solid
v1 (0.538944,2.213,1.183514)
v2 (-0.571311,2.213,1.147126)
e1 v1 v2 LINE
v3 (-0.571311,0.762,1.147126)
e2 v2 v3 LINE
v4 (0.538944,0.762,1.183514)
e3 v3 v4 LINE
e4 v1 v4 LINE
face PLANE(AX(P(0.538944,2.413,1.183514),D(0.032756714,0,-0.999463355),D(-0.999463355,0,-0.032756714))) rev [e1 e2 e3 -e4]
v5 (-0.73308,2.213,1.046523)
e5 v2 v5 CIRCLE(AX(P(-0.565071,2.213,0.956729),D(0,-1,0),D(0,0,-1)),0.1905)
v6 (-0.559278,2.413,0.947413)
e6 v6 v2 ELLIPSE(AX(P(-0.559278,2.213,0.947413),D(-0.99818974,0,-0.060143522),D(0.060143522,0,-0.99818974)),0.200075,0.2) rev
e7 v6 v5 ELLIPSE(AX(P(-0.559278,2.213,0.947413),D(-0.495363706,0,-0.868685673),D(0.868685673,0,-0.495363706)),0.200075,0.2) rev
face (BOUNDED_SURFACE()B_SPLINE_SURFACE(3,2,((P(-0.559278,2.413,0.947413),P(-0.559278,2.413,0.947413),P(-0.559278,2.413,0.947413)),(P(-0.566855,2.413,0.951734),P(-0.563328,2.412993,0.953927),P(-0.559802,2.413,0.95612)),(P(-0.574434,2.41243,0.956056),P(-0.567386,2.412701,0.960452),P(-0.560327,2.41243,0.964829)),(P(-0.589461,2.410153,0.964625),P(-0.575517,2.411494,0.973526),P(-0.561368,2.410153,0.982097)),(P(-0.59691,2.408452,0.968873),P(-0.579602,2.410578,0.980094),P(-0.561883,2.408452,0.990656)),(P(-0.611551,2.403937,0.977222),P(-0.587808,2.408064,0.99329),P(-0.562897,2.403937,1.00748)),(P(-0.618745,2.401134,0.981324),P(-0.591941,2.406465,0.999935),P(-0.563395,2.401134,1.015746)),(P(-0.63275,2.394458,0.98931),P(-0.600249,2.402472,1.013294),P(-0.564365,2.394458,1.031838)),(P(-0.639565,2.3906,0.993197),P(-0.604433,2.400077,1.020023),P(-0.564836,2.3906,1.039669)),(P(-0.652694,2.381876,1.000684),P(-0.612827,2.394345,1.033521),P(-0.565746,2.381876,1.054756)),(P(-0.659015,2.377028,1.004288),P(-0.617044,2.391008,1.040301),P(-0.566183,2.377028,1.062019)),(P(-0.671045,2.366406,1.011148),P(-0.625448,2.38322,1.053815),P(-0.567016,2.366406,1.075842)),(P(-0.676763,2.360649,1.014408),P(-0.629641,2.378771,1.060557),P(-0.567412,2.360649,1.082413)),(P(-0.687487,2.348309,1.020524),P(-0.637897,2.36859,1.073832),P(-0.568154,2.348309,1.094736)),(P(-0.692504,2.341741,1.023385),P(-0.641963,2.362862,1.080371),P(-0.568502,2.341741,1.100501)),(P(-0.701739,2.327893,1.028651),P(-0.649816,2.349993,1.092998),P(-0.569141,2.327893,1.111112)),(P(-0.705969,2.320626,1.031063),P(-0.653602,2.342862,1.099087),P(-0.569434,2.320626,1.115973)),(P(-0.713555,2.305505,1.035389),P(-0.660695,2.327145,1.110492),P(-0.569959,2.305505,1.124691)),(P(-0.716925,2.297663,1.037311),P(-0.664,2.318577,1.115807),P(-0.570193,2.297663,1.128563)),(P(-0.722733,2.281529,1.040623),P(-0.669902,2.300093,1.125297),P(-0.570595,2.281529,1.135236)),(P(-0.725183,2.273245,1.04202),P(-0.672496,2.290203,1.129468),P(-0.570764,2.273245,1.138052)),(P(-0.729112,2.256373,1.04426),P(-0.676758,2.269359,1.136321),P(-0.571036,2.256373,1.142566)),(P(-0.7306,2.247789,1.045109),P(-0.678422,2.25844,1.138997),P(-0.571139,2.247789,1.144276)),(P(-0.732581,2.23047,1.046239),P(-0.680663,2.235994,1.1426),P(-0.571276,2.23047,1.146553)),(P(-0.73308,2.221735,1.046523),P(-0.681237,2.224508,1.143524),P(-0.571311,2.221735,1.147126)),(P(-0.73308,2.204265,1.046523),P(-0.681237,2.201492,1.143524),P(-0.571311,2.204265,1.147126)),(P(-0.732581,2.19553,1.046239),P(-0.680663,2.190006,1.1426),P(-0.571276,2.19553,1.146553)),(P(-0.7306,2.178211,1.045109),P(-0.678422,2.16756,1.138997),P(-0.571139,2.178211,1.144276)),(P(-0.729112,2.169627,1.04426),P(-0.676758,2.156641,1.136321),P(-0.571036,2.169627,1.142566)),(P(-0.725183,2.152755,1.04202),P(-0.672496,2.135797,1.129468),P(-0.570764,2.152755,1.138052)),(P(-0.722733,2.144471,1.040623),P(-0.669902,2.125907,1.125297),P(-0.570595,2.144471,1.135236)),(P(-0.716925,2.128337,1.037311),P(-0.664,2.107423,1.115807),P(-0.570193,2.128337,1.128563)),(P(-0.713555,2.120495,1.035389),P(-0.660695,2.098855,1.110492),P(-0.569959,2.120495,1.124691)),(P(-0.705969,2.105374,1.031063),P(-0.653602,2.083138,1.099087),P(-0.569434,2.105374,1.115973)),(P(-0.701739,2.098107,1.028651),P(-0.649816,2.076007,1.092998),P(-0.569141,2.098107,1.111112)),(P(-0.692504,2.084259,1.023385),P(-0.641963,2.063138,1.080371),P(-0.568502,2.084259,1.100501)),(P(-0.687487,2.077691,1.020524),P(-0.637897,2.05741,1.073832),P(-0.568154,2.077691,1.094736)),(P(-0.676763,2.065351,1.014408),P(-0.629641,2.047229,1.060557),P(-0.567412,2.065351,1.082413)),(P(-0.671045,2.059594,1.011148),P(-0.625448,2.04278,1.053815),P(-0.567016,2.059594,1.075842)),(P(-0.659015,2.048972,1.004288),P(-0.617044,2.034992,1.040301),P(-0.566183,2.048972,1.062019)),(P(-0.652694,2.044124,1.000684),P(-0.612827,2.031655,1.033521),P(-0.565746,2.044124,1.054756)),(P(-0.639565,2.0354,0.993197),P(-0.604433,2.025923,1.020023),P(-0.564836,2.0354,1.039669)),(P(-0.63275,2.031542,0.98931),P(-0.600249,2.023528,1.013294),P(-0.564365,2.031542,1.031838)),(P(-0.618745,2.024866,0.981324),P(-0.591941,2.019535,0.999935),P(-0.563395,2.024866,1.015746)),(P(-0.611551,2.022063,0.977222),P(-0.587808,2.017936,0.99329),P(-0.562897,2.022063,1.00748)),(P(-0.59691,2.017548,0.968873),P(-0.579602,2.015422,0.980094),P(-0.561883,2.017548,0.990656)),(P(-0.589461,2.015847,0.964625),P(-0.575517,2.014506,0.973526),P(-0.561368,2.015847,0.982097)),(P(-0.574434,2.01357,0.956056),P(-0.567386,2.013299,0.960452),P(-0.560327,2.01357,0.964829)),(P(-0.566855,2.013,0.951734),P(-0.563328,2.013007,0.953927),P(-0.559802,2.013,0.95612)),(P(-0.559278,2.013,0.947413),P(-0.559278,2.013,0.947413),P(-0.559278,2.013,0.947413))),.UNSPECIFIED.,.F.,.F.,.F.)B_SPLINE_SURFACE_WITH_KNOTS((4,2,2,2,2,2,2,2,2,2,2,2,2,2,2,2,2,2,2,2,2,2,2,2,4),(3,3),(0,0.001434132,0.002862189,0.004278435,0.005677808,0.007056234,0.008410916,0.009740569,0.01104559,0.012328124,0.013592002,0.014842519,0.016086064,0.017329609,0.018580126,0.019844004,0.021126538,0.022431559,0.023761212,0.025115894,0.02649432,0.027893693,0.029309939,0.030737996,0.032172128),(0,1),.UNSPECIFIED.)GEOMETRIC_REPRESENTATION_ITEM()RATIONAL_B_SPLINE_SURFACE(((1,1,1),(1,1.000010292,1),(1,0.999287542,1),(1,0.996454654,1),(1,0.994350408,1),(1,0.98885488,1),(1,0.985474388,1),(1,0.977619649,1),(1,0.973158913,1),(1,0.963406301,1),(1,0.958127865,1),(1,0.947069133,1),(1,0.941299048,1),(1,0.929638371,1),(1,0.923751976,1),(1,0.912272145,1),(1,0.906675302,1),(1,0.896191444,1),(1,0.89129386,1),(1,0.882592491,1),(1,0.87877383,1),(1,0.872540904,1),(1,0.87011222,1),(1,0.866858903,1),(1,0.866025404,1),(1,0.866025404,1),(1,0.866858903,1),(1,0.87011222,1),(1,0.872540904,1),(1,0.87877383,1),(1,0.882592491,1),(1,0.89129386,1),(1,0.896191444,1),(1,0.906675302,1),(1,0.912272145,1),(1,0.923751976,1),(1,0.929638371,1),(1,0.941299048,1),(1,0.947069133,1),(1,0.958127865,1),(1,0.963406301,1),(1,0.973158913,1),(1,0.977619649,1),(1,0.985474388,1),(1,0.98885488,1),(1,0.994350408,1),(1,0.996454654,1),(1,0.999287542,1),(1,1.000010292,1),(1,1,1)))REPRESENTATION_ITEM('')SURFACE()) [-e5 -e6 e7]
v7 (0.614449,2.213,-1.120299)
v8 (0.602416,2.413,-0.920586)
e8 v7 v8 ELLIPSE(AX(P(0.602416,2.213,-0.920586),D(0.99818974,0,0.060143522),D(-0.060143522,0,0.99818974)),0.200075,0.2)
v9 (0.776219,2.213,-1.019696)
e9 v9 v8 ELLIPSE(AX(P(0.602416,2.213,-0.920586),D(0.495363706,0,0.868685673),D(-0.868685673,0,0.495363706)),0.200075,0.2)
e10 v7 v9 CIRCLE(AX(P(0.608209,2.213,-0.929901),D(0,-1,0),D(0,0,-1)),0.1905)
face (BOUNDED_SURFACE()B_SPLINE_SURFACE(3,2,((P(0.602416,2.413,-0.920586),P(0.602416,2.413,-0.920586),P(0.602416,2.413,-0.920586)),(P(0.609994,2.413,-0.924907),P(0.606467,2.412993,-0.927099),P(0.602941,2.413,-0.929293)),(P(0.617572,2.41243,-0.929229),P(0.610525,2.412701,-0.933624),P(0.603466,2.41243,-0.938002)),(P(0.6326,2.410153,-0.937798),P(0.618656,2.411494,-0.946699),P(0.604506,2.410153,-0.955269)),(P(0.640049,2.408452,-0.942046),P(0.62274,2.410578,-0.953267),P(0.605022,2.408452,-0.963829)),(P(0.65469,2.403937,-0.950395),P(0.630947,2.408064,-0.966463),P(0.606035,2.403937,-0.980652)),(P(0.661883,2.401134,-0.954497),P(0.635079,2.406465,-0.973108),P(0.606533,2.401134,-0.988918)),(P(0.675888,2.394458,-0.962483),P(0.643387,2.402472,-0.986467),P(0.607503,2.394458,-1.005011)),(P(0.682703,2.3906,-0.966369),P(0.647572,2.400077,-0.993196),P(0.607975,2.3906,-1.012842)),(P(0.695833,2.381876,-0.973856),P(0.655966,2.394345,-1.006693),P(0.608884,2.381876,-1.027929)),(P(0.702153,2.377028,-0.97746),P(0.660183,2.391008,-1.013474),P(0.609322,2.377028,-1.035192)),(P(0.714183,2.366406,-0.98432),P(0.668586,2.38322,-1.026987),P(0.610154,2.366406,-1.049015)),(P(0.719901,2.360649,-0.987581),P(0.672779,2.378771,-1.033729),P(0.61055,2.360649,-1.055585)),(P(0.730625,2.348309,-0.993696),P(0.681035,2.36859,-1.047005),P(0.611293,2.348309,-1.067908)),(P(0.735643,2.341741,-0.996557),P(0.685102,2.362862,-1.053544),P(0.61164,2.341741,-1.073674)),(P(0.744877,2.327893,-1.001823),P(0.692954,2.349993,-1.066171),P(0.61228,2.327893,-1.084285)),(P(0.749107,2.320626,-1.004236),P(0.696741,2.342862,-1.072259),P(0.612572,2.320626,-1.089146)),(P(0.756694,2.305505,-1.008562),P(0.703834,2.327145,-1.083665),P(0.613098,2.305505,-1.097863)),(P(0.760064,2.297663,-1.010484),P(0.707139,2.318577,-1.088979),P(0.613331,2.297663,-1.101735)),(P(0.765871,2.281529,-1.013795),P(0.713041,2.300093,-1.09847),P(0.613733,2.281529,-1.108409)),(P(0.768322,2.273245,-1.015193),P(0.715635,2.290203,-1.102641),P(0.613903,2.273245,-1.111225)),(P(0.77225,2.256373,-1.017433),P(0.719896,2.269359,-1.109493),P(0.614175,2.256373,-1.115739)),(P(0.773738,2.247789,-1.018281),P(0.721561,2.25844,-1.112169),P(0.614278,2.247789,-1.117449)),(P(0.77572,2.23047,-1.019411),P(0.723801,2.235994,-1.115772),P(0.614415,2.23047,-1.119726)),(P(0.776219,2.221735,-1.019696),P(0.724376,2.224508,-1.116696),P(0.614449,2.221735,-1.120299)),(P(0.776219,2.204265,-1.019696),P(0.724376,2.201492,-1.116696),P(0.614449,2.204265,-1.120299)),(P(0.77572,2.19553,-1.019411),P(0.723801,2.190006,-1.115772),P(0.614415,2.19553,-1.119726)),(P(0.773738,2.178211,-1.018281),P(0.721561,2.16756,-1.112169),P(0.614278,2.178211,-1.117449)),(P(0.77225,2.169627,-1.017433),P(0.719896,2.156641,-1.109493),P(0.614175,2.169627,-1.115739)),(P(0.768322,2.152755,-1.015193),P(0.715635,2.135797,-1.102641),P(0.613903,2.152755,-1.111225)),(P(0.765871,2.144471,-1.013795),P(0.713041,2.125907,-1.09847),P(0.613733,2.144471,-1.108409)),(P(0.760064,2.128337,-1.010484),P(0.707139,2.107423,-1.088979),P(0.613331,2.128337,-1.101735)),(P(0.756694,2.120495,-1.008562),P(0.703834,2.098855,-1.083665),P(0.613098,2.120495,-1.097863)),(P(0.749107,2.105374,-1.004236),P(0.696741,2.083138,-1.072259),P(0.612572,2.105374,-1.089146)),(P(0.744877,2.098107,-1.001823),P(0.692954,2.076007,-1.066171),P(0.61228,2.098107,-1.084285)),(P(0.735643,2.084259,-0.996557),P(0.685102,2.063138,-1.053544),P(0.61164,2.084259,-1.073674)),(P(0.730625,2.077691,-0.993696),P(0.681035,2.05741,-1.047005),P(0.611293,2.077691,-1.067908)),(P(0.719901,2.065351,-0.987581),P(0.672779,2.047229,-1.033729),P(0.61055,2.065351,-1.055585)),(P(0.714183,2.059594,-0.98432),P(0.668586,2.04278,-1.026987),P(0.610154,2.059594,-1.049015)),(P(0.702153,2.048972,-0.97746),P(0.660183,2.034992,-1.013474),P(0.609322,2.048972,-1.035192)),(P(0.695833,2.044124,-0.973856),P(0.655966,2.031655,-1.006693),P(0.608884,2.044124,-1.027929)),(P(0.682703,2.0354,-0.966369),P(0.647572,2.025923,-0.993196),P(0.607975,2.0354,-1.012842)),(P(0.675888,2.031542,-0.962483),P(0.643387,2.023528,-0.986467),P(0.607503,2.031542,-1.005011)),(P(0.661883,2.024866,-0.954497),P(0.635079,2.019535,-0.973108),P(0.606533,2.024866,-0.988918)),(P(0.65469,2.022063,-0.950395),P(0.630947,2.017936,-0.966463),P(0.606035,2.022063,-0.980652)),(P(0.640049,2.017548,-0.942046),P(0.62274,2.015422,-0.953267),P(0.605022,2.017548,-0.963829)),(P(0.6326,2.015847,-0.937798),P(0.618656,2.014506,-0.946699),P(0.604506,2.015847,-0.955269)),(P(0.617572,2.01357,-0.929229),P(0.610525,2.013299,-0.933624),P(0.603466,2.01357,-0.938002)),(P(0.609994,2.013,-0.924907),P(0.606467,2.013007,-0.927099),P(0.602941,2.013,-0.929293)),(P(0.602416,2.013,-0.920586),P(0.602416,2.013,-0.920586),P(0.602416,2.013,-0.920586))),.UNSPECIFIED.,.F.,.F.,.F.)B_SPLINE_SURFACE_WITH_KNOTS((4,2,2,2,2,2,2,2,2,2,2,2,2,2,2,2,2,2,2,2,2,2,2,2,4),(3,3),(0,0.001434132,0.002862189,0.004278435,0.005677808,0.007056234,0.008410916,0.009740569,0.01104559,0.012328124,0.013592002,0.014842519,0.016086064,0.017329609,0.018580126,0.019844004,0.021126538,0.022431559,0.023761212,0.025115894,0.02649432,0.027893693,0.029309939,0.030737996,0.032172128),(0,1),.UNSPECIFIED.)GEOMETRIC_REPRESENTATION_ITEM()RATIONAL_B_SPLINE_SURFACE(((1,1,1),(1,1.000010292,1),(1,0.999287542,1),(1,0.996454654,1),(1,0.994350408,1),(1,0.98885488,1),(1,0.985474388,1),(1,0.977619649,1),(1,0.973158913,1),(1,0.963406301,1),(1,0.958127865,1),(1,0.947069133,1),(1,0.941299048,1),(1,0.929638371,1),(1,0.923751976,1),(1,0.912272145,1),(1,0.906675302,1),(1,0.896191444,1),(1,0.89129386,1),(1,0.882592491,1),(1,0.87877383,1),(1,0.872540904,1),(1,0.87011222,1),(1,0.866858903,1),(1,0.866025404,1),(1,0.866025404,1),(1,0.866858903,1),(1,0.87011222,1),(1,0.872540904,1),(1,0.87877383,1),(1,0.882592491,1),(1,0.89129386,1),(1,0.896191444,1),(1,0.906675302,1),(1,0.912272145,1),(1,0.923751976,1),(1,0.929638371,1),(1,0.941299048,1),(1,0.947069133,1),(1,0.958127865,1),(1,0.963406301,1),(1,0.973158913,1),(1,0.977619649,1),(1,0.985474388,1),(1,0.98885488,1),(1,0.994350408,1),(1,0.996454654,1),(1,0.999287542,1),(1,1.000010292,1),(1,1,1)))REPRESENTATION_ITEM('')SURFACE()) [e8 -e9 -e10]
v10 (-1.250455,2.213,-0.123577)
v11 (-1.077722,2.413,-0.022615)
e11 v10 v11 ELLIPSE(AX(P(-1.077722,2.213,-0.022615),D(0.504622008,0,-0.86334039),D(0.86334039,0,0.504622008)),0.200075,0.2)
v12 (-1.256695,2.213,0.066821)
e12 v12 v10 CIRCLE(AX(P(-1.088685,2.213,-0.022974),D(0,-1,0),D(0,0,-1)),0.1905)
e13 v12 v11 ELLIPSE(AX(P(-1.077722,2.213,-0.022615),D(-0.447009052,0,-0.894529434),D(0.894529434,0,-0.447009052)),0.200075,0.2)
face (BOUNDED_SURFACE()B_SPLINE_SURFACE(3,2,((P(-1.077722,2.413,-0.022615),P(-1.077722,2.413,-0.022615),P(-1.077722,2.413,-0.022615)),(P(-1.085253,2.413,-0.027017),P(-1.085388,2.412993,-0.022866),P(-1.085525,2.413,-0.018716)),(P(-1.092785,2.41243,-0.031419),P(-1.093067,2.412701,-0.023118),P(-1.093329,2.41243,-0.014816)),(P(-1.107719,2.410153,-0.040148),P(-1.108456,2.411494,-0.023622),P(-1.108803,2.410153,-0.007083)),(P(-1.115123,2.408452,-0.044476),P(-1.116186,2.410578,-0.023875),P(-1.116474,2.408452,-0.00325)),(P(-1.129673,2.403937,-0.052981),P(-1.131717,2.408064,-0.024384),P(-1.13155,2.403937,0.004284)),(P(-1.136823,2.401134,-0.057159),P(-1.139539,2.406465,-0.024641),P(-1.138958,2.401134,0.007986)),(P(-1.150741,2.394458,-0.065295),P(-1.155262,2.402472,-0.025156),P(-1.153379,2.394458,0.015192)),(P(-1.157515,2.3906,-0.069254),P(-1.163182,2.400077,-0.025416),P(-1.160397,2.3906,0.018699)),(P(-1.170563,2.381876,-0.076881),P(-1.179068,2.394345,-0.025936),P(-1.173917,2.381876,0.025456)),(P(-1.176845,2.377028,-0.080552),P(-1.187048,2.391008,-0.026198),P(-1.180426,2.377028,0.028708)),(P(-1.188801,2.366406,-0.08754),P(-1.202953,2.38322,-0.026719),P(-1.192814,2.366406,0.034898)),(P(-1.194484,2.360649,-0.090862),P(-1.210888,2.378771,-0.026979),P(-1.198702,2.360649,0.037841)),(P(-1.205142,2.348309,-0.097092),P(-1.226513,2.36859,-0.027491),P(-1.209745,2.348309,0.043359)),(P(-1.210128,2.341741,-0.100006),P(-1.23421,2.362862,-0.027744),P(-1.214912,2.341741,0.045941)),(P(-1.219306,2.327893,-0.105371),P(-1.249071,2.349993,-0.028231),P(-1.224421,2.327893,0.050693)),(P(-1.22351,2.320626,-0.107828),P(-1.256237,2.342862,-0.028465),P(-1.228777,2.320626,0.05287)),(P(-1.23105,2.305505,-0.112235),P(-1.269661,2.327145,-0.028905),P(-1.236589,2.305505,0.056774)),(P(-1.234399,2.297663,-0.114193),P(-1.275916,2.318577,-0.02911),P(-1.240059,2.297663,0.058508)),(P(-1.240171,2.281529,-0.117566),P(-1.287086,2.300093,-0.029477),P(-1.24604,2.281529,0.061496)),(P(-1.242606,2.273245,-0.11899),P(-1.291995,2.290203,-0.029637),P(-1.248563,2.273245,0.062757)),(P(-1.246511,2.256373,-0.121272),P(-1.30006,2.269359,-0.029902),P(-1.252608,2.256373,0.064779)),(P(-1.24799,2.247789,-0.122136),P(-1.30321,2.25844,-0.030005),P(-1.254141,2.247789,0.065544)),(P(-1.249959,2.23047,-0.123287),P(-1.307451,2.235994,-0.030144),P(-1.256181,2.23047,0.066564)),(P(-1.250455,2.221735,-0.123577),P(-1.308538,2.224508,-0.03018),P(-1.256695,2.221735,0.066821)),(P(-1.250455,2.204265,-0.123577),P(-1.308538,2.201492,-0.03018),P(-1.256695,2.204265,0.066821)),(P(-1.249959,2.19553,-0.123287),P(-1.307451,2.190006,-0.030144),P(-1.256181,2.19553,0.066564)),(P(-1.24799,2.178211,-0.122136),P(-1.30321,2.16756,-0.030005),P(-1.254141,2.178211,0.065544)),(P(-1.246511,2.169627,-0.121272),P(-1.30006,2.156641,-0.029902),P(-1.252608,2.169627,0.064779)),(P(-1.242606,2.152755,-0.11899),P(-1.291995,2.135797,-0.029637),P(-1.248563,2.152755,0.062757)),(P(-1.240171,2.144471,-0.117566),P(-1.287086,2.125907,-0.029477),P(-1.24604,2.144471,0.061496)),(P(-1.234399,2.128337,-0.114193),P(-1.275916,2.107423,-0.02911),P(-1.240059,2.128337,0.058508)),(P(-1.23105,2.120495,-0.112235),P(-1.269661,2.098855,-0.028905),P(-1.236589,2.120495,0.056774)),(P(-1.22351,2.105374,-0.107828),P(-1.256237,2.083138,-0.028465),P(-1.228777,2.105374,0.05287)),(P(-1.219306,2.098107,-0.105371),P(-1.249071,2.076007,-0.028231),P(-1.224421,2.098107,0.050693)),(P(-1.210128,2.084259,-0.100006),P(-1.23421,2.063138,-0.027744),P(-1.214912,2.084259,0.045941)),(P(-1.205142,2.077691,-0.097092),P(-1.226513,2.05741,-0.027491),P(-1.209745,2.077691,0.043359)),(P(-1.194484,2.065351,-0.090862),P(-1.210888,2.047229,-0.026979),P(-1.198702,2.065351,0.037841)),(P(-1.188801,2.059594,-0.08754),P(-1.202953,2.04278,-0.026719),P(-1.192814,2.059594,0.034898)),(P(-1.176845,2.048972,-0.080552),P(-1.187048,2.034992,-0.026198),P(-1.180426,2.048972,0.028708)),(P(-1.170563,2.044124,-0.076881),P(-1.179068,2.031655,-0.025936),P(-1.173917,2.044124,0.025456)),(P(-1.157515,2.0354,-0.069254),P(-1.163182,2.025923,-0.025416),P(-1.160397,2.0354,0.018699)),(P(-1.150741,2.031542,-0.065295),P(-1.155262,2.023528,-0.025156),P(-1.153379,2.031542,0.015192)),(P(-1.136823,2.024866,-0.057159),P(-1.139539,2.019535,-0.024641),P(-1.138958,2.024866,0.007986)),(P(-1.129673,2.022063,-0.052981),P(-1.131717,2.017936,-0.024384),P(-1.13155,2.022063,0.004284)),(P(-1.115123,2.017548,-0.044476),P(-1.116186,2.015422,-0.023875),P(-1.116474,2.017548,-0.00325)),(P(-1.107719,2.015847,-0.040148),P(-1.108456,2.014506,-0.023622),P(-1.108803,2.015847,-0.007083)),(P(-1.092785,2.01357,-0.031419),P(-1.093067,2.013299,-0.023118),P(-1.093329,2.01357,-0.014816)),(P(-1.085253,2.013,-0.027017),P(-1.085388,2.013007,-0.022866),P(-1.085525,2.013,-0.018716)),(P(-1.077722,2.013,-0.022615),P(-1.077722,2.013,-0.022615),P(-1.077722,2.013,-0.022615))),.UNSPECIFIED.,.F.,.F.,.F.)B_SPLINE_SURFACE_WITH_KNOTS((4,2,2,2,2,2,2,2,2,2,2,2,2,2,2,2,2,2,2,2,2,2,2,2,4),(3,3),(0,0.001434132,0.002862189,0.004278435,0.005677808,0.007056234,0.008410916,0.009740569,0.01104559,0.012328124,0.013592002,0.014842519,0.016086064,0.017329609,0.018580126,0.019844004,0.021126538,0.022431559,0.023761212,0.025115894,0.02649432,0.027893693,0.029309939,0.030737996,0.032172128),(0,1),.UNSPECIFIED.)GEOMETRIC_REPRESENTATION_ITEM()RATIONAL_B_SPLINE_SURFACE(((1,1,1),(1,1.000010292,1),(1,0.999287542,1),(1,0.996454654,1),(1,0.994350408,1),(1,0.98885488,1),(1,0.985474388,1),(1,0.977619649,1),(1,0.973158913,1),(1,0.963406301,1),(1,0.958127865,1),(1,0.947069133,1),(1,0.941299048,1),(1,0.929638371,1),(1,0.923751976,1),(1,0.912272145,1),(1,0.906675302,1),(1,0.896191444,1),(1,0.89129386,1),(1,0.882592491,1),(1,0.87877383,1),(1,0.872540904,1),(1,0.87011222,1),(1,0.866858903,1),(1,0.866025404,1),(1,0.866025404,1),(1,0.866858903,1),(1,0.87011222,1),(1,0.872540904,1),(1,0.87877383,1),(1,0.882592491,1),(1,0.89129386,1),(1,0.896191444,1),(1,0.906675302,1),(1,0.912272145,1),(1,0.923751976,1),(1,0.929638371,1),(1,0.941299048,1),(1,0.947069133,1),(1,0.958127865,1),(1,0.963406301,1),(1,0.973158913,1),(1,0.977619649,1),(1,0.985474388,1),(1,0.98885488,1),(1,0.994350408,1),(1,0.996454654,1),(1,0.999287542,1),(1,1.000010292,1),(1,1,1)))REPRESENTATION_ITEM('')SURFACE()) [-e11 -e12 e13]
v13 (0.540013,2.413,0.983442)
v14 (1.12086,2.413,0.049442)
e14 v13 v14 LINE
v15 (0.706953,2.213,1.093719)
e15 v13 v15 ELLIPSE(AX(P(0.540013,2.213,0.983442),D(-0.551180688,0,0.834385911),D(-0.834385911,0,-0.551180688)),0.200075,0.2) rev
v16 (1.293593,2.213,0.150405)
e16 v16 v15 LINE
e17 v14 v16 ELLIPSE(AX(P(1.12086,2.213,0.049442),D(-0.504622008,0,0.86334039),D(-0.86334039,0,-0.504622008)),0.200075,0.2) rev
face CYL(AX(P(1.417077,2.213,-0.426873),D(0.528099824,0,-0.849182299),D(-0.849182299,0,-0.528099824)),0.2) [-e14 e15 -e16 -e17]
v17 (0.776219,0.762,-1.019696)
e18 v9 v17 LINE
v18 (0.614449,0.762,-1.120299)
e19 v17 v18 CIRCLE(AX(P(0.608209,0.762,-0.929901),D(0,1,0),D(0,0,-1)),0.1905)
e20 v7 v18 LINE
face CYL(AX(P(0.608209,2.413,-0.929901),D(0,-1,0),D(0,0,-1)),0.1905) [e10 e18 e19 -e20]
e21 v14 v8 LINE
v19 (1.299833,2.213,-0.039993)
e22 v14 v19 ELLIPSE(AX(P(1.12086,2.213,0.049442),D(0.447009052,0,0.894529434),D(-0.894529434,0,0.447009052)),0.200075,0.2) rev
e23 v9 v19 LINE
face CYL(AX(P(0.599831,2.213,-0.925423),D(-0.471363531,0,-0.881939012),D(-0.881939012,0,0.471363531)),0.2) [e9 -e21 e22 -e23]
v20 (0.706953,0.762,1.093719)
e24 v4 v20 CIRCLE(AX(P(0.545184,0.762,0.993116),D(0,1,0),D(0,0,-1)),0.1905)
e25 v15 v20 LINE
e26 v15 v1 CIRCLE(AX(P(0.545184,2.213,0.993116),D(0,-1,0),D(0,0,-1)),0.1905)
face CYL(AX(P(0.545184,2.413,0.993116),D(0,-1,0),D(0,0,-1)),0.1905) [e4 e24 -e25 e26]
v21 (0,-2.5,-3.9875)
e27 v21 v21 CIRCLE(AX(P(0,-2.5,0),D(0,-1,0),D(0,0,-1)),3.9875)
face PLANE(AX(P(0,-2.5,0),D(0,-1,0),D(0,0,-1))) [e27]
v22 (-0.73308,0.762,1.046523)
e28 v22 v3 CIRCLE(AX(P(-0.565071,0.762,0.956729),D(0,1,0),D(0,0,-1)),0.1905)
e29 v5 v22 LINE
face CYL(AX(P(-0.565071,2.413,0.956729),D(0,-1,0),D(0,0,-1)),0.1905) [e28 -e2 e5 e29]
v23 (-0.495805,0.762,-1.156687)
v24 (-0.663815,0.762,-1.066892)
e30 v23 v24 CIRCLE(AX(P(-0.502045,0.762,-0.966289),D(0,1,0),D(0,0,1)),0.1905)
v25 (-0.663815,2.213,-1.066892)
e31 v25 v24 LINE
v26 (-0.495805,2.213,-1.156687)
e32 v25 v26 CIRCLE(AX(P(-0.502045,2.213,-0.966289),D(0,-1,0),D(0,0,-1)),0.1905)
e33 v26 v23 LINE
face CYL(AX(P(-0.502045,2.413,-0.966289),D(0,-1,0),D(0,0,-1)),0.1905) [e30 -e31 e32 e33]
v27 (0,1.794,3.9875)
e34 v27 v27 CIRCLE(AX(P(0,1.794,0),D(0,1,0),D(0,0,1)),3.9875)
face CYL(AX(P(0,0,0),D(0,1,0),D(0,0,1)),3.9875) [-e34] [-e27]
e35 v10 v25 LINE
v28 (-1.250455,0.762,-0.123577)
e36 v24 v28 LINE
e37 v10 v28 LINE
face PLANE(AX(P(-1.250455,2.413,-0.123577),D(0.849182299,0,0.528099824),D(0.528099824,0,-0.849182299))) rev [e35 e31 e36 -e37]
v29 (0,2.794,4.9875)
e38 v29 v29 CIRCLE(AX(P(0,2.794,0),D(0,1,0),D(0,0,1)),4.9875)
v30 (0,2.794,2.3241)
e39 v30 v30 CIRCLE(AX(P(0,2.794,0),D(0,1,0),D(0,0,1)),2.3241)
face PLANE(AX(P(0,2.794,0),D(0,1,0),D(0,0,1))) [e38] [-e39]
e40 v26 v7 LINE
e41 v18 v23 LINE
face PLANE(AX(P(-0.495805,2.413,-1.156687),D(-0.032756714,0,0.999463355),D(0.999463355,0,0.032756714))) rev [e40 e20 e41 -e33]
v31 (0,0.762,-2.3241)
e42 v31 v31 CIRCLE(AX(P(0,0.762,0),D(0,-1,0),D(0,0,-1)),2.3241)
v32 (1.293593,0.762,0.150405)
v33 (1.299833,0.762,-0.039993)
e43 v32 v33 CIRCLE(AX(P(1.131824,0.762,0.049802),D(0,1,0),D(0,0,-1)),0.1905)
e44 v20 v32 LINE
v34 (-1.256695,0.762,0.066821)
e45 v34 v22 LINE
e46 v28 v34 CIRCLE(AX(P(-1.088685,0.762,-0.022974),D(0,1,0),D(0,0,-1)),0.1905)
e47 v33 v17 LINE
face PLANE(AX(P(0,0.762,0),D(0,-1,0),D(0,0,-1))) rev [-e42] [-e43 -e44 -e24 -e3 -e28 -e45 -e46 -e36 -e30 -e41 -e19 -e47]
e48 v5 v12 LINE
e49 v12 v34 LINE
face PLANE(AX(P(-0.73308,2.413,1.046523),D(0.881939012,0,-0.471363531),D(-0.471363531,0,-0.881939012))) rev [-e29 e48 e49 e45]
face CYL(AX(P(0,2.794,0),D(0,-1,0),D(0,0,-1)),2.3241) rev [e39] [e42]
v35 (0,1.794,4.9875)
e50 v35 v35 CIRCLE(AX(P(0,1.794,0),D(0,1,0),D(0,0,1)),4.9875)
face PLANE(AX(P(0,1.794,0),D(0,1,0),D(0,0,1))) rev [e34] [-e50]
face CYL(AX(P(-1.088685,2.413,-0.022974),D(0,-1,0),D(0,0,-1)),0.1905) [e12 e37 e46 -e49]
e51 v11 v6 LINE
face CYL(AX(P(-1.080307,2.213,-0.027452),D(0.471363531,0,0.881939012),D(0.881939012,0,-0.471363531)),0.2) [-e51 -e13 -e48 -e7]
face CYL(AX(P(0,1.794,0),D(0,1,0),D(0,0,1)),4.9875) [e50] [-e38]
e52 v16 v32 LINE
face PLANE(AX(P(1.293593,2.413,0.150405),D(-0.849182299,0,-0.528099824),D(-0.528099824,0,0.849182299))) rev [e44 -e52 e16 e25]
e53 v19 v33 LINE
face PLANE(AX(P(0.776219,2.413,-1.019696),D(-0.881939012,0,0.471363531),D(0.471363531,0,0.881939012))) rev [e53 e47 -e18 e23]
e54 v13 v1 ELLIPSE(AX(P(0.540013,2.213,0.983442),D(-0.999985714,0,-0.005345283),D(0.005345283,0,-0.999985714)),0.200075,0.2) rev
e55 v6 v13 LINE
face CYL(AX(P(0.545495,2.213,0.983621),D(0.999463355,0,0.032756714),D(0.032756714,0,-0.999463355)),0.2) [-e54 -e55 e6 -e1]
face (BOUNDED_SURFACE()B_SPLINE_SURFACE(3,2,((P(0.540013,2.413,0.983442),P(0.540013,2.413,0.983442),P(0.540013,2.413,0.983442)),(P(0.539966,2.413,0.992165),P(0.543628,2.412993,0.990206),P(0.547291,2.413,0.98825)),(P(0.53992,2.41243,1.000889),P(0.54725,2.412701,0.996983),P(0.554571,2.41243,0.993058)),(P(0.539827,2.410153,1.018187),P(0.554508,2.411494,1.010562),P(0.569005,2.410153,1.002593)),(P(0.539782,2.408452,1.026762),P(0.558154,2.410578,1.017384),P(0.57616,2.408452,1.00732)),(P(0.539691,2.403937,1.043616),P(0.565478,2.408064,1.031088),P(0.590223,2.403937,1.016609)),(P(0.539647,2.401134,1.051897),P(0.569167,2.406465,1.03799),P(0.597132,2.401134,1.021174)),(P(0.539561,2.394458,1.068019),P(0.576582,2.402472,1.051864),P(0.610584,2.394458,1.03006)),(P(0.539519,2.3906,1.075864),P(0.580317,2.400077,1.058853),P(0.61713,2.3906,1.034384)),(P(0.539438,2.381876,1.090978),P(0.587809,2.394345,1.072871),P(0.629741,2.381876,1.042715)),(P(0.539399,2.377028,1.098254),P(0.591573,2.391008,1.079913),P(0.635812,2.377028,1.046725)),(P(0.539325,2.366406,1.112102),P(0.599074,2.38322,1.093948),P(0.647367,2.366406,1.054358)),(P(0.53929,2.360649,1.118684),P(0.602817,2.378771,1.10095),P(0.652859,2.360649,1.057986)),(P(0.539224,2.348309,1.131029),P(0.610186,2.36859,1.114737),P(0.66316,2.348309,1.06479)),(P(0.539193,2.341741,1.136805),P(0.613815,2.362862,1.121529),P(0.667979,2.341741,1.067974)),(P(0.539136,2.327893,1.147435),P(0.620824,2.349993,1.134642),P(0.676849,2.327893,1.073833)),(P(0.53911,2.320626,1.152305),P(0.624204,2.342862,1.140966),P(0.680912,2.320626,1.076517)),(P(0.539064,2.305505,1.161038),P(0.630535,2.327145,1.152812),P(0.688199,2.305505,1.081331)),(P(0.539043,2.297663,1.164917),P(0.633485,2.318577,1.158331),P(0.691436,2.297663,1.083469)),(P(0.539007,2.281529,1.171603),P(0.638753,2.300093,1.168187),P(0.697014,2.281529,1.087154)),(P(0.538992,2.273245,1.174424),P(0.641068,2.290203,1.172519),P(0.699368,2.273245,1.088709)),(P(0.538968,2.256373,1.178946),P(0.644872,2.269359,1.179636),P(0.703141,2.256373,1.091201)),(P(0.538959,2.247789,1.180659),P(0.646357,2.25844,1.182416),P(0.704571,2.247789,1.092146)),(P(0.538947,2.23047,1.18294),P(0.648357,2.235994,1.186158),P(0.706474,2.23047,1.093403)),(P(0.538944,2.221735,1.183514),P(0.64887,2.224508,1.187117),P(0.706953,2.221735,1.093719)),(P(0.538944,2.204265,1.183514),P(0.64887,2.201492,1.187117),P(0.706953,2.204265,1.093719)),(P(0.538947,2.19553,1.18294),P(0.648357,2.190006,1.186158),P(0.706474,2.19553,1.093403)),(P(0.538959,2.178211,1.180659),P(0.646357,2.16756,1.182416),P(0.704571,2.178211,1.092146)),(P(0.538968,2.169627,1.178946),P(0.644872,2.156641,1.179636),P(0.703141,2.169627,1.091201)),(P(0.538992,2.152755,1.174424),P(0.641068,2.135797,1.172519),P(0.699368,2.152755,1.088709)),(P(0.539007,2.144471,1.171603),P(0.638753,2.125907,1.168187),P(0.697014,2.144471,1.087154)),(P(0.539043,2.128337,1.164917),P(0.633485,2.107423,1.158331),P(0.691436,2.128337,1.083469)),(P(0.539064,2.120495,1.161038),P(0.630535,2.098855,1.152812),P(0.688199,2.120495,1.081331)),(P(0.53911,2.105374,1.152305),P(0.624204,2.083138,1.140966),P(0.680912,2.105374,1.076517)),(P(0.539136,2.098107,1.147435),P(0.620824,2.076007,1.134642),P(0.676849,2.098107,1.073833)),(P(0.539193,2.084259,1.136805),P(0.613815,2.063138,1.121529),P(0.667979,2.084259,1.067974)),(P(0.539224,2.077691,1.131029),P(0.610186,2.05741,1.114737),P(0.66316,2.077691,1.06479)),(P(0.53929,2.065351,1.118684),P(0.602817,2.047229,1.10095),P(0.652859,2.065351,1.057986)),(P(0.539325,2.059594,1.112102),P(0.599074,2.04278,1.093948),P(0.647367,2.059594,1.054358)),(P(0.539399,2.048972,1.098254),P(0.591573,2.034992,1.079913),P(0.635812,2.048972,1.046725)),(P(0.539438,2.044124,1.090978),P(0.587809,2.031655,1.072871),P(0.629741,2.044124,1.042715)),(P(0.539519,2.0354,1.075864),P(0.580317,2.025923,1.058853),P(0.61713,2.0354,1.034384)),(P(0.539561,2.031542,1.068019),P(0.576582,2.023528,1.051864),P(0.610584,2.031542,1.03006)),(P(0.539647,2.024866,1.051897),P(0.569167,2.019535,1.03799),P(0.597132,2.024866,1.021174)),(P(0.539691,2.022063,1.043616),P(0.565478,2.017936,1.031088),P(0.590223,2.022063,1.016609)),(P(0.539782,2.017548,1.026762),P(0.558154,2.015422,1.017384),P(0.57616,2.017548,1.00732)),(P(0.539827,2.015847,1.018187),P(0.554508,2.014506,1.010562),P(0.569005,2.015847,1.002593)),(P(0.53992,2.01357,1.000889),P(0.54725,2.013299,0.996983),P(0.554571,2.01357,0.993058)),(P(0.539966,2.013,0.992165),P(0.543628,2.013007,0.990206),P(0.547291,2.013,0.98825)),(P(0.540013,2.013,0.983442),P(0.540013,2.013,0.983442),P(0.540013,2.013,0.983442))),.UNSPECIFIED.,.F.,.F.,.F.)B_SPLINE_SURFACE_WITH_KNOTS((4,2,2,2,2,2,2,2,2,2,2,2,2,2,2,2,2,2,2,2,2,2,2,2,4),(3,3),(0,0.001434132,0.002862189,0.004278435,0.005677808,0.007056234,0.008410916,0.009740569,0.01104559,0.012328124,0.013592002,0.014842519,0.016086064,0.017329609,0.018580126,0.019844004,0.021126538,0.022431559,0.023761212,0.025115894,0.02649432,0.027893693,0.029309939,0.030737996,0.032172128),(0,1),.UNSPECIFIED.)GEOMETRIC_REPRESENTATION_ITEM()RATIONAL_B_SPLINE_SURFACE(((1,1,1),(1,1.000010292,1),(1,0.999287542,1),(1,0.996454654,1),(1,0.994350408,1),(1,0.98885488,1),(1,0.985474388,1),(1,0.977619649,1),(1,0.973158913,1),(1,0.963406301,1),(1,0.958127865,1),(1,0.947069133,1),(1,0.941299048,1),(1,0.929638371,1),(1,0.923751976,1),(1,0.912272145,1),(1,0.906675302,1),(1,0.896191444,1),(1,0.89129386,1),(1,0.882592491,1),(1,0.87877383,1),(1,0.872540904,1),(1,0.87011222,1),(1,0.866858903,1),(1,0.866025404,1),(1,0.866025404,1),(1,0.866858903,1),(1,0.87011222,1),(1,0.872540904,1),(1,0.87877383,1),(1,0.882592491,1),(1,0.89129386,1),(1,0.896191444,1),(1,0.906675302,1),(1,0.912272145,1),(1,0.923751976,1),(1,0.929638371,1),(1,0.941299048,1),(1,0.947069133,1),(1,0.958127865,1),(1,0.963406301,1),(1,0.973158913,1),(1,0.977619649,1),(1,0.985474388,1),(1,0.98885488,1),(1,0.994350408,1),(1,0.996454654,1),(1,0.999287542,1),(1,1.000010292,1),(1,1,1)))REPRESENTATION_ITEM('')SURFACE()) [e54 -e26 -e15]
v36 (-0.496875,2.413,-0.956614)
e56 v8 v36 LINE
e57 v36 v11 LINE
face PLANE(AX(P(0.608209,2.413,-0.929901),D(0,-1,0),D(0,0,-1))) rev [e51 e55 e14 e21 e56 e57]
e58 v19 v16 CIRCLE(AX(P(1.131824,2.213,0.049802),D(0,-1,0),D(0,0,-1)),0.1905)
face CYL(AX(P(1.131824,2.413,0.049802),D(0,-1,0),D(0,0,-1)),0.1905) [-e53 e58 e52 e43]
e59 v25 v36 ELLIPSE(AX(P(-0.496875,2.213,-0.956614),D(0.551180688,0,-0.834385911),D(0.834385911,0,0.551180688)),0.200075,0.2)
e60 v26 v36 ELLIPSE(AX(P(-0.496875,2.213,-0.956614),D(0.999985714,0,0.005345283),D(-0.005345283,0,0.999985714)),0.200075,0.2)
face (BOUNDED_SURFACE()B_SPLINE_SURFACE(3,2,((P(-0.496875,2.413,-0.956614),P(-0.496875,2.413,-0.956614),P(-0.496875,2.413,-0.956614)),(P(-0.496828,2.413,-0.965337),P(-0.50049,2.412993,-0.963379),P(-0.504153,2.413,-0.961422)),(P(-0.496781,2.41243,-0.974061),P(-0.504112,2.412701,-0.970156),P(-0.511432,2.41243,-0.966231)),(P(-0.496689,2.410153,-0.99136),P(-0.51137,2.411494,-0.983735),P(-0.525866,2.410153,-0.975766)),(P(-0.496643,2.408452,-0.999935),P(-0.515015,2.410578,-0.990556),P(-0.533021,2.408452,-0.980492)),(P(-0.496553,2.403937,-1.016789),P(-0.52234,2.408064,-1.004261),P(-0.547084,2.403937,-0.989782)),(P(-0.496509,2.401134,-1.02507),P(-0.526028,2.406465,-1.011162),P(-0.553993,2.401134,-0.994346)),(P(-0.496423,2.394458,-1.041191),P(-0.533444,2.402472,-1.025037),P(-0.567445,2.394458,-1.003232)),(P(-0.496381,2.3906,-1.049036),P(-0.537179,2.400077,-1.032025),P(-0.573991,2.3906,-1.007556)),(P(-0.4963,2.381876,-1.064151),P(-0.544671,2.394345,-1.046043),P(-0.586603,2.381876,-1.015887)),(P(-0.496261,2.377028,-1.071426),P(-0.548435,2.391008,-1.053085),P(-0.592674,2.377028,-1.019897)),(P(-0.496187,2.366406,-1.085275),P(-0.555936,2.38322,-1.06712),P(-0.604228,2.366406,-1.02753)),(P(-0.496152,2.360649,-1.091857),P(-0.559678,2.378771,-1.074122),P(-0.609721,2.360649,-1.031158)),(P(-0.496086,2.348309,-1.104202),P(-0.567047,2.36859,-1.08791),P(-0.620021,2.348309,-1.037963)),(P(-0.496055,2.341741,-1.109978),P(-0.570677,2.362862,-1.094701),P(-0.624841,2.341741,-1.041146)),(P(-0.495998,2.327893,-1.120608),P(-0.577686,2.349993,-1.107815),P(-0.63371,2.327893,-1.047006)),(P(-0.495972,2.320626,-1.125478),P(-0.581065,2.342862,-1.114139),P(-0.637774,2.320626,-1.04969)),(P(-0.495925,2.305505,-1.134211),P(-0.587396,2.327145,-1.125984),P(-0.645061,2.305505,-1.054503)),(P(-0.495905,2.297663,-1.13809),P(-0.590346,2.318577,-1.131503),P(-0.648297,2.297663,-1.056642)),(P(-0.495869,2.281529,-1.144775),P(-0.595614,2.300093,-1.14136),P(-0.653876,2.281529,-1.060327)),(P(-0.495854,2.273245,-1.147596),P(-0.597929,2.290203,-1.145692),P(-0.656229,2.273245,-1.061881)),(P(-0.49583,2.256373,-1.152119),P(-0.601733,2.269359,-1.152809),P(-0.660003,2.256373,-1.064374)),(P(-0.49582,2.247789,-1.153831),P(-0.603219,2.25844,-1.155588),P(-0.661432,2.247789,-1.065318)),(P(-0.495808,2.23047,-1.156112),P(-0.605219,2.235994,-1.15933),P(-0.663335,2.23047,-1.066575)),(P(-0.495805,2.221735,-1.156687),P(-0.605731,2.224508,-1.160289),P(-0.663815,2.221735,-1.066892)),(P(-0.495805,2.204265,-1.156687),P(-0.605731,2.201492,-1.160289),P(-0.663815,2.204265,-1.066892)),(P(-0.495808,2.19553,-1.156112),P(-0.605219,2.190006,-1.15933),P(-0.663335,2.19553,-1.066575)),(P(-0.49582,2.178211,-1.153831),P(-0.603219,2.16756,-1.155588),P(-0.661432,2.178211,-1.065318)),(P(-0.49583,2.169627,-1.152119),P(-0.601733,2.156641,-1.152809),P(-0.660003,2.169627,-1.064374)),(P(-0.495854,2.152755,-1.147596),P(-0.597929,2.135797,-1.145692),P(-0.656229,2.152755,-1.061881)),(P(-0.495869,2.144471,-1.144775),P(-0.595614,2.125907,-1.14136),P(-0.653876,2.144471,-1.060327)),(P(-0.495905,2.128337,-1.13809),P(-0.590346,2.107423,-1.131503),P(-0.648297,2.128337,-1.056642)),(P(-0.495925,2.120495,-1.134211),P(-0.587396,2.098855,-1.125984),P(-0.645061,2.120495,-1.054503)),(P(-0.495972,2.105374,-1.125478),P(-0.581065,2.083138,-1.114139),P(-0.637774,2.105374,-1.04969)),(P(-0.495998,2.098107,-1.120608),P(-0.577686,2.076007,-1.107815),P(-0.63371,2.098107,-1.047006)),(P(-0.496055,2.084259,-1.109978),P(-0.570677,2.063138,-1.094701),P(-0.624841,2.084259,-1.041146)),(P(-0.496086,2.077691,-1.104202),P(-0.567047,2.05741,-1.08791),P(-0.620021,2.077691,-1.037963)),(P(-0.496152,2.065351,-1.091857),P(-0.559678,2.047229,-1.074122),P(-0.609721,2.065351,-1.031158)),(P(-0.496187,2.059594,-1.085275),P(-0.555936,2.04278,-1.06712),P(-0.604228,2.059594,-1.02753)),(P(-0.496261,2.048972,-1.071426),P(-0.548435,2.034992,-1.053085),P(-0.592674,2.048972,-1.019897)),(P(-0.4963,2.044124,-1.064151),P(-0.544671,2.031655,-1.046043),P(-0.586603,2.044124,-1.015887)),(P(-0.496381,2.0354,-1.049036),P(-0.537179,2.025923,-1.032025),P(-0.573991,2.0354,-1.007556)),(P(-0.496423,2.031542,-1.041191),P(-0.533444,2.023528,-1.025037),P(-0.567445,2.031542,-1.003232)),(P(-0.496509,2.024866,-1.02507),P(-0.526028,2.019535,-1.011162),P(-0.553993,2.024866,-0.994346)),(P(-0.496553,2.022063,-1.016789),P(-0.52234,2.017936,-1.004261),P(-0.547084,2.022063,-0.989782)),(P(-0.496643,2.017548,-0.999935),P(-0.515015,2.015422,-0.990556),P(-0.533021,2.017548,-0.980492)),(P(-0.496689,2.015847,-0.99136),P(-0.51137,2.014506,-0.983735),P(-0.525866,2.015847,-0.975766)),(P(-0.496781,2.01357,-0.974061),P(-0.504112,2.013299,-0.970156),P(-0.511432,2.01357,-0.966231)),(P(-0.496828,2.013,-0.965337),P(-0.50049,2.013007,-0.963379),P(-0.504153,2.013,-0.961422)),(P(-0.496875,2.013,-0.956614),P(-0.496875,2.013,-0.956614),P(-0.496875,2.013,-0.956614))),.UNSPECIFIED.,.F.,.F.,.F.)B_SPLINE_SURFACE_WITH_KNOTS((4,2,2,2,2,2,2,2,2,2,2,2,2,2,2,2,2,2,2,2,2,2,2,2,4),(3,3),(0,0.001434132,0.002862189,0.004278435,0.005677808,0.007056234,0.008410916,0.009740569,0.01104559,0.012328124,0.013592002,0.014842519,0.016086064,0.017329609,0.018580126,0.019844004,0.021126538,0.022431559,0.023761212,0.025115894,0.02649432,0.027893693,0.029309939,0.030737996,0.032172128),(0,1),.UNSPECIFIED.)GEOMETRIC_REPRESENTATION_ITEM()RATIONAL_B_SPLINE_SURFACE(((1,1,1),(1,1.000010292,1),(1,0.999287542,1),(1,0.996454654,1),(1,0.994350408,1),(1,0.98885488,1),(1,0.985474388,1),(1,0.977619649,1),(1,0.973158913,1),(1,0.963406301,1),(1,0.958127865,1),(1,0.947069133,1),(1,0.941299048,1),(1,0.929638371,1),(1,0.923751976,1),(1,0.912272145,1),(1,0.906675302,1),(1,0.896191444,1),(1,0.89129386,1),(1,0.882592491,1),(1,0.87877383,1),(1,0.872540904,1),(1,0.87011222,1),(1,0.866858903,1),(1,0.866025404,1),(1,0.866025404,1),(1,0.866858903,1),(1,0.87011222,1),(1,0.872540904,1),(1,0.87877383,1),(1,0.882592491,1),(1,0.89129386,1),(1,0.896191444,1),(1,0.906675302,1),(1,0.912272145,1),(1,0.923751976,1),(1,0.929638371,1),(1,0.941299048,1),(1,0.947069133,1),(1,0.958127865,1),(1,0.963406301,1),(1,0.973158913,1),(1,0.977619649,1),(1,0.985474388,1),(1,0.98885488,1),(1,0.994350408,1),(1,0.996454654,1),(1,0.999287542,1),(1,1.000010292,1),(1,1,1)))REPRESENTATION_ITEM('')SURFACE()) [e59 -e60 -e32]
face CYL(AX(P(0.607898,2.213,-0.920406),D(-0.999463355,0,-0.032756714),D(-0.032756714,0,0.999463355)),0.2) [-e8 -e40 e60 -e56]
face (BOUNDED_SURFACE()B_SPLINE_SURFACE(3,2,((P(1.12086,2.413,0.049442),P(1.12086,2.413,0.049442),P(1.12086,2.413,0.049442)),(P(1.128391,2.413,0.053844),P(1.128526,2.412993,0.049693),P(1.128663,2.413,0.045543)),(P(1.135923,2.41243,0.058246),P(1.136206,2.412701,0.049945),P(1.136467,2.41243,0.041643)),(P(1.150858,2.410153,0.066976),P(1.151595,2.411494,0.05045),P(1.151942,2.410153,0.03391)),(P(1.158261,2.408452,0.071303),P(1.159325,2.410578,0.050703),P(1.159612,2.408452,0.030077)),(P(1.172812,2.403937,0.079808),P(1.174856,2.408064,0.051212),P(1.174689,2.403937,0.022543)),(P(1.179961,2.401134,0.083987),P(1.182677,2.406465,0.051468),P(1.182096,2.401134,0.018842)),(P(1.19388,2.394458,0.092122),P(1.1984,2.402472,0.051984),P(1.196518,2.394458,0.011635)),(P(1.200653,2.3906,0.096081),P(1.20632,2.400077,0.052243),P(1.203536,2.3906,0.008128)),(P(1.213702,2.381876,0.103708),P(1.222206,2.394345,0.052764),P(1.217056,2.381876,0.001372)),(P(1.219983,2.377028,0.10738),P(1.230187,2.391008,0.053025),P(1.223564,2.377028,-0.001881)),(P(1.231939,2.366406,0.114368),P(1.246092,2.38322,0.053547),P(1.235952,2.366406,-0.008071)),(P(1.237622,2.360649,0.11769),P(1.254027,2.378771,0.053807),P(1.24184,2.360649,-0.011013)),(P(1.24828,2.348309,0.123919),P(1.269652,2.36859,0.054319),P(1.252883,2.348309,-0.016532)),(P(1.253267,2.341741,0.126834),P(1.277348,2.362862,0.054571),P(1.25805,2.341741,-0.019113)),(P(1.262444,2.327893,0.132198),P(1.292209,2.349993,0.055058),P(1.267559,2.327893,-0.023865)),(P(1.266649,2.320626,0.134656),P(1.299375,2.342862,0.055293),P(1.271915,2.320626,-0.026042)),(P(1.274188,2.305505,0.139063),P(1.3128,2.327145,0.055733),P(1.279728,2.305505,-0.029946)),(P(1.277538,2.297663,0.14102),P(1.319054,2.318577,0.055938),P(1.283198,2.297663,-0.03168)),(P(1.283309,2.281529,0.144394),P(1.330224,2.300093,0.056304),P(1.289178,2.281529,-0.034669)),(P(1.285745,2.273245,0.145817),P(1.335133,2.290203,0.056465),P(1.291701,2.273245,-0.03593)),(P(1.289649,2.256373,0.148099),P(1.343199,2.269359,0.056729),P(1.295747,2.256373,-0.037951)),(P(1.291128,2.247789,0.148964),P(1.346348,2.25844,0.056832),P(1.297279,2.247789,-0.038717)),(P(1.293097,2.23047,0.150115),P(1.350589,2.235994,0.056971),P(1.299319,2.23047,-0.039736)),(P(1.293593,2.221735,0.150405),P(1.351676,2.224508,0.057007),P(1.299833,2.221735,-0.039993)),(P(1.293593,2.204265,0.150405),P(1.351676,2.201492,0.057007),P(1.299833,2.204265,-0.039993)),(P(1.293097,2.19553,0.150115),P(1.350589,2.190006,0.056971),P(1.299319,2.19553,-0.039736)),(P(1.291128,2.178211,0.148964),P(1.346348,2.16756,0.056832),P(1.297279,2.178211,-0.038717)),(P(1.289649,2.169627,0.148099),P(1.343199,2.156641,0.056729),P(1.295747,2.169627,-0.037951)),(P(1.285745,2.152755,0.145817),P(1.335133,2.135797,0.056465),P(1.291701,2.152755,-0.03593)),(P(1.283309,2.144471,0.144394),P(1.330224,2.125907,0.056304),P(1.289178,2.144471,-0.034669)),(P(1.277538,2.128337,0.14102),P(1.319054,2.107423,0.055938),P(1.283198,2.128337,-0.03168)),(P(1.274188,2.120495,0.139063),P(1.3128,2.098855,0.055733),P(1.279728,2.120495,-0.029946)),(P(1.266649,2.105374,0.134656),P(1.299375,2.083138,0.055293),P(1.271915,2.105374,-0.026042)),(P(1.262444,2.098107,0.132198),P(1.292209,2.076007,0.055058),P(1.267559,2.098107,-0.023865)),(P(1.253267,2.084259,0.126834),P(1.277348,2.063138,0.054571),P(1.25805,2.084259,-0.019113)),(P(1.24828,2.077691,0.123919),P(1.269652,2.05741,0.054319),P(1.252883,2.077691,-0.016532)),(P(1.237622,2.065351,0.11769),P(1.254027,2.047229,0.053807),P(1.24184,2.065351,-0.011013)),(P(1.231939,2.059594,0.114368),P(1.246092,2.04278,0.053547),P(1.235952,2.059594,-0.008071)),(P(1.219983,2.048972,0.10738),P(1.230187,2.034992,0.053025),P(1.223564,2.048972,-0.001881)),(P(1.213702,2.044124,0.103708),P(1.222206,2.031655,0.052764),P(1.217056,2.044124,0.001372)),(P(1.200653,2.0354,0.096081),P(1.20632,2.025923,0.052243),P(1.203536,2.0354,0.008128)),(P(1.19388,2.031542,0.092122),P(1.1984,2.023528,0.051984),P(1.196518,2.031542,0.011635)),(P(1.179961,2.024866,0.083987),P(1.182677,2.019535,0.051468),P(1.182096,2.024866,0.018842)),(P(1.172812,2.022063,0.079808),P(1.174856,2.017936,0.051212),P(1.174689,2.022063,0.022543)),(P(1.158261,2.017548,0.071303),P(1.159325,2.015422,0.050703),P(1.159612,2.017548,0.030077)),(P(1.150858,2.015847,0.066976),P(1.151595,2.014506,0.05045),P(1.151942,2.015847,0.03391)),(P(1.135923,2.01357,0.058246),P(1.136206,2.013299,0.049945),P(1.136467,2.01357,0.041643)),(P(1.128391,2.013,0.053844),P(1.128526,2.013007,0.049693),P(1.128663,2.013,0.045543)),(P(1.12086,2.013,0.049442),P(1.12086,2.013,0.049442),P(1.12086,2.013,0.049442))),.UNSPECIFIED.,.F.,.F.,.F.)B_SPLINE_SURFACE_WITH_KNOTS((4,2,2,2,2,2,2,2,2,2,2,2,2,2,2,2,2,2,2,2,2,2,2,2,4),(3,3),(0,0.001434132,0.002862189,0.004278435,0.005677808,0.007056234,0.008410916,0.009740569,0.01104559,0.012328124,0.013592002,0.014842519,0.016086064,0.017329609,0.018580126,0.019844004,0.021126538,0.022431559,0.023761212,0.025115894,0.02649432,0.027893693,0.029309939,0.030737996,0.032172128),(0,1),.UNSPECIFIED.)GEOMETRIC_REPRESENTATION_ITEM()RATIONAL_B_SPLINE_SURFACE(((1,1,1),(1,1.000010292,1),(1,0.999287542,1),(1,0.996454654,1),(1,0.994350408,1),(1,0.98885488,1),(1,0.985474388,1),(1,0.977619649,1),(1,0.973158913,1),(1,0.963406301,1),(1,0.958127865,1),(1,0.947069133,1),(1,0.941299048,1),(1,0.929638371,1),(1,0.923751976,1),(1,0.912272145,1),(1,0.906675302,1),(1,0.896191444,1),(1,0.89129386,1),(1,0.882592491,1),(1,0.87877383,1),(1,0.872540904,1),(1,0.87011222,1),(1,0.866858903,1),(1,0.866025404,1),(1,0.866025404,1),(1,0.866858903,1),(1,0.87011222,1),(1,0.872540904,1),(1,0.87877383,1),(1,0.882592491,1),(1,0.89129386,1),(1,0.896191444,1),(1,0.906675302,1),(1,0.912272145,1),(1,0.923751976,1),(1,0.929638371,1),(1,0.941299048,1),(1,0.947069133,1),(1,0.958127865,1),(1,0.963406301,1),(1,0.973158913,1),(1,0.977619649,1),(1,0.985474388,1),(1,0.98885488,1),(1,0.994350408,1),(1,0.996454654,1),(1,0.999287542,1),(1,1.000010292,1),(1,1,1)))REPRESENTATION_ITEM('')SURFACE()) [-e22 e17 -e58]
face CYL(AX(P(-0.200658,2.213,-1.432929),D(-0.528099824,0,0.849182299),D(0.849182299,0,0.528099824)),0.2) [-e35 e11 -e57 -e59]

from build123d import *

# Parameters (mm, degrees)
SKETCH1_R           = 6.8961
SKETCH1_R_2         = 2.3241
BOSS_EXTRUDE1_DEPTH = 2.794
SKETCH2_R           = 2.3241
BOSS_EXTRUDE2_DEPTH = 0.762
BOSS_EXTRUDE3_DEPTH = 1.651
SKETCH5_R           = 8.206879239
SKETCH5_R_2         = 3.9875
CUT_EXTRUDE1_DEPTH  = 11.144891642
SKETCH6_R           = 4.9875
SKETCH6_R_2         = 3.9875
BOSS_EXTRUDE4_DEPTH = 1
FILLET1_R           = 0.2
SKETCH7_R           = 3.9875
BOSS_EXTRUDE5_DEPTH = 2.5


with BuildPart() as part:
    # Sketch1 → Boss-Extrude1 (new body)
    with BuildSketch(Plane(origin=(0, 0, 0), x_dir=(1, 0, 0), z_dir=(0, 1, 0))):
        Circle(SKETCH1_R)
        Circle(SKETCH1_R_2, mode=Mode.SUBTRACT)
    extrude(amount=BOSS_EXTRUDE1_DEPTH)

    # Sketch2 → Boss-Extrude2 (add)
    with BuildSketch(Plane.XZ):
        Circle(SKETCH2_R)
    extrude(amount=-BOSS_EXTRUDE2_DEPTH)

    # Sketch3 → Boss-Extrude3 (add)
    with BuildSketch(Plane(origin=(0, 0.762, 0), x_dir=(1, 0, 0), z_dir=(0, 1, 0))):
        with BuildLine():
            Line((-0.495805164, 1.156686678), (0.614449488, 1.120298857))
            ThreePointArc((0.614449488, 1.120298857), (0.708812351, 1.091670316), (0.776218716, 1.01969584))
            Line((0.776218716, 1.01969584), (1.299833265, 0.039993196))
            ThreePointArc((1.299833265, 0.039993196), (1.322221652, -0.056041711), (1.293593111, -0.150404573))
            Line((1.293593111, -0.150404573), (0.706953007, -1.093719397))
            ThreePointArc((0.706953007, -1.093719397), (0.634978532, -1.161125762), (0.538943625, -1.183514149))
            Line((0.538943625, -1.183514149), (-0.571311028, -1.147126328))
            ThreePointArc((-0.571311028, -1.147126328), (-0.66567389, -1.118497787), (-0.733080255, -1.046523312))
            Line((-0.733080255, -1.046523312), (-1.256694804, -0.066820667))
            ThreePointArc((-1.256694804, -0.066820667), (-1.279083191, 0.02921424), (-1.25045465, 0.123577102))
            Line((-1.25045465, 0.123577102), (-0.663814546, 1.066891925))
            ThreePointArc((-0.663814546, 1.066891925), (-0.591840071, 1.134298291), (-0.495805164, 1.156686678))
        make_face()
    extrude(amount=BOSS_EXTRUDE3_DEPTH)

    # Sketch5 → Cut-Extrude1 (cut, through all)
    with BuildSketch(Plane(origin=(0, 2.794, 0), x_dir=(1, 0, 0), z_dir=(0, 1, 0))):
        Circle(SKETCH5_R)
        Circle(SKETCH5_R_2, mode=Mode.SUBTRACT)
    extrude(amount=-CUT_EXTRUDE1_DEPTH, mode=Mode.SUBTRACT)

    # Sketch6 → Boss-Extrude4 (add)
    with BuildSketch(Plane(origin=(0, 2.794, 0), x_dir=(1, 0, 0), z_dir=(0, 1, 0))):
        Circle(SKETCH6_R)
        Circle(SKETCH6_R_2, mode=Mode.SUBTRACT)
    extrude(amount=-BOSS_EXTRUDE4_DEPTH)

    # Fillet1
    fillet1_edges = [part.edges().sort_by_distance(p)[0] for p in [
        (1.038025991, 2.413, -0.529844518),
        (1.322221652, 2.413, 0.056041711),
        (1.000273059, 2.413, 0.622061985),
        (0.634978532, 2.413, 1.161125762),
        (-0.016183701, 2.413, 1.165320239),
        (-0.66567389, 2.413, 1.118497787),
        (-0.99488753, 2.413, 0.556671989),
        (-1.279083191, 2.413, -0.02921424),
        (-0.957134598, 2.413, -0.595234514),
        (-0.591840071, 2.413, -1.134298291),
        (0.059322162, 2.413, -1.138492768),
        (0.708812351, 2.413, -1.091670316),
    ]]
    fillet(fillet1_edges, radius=FILLET1_R)

    # Sketch7 → Boss-Extrude5 (add)
    with BuildSketch(Plane.XZ):
        Circle(SKETCH7_R)
    extrude(amount=BOSS_EXTRUDE5_DEPTH)


solid = part.part
